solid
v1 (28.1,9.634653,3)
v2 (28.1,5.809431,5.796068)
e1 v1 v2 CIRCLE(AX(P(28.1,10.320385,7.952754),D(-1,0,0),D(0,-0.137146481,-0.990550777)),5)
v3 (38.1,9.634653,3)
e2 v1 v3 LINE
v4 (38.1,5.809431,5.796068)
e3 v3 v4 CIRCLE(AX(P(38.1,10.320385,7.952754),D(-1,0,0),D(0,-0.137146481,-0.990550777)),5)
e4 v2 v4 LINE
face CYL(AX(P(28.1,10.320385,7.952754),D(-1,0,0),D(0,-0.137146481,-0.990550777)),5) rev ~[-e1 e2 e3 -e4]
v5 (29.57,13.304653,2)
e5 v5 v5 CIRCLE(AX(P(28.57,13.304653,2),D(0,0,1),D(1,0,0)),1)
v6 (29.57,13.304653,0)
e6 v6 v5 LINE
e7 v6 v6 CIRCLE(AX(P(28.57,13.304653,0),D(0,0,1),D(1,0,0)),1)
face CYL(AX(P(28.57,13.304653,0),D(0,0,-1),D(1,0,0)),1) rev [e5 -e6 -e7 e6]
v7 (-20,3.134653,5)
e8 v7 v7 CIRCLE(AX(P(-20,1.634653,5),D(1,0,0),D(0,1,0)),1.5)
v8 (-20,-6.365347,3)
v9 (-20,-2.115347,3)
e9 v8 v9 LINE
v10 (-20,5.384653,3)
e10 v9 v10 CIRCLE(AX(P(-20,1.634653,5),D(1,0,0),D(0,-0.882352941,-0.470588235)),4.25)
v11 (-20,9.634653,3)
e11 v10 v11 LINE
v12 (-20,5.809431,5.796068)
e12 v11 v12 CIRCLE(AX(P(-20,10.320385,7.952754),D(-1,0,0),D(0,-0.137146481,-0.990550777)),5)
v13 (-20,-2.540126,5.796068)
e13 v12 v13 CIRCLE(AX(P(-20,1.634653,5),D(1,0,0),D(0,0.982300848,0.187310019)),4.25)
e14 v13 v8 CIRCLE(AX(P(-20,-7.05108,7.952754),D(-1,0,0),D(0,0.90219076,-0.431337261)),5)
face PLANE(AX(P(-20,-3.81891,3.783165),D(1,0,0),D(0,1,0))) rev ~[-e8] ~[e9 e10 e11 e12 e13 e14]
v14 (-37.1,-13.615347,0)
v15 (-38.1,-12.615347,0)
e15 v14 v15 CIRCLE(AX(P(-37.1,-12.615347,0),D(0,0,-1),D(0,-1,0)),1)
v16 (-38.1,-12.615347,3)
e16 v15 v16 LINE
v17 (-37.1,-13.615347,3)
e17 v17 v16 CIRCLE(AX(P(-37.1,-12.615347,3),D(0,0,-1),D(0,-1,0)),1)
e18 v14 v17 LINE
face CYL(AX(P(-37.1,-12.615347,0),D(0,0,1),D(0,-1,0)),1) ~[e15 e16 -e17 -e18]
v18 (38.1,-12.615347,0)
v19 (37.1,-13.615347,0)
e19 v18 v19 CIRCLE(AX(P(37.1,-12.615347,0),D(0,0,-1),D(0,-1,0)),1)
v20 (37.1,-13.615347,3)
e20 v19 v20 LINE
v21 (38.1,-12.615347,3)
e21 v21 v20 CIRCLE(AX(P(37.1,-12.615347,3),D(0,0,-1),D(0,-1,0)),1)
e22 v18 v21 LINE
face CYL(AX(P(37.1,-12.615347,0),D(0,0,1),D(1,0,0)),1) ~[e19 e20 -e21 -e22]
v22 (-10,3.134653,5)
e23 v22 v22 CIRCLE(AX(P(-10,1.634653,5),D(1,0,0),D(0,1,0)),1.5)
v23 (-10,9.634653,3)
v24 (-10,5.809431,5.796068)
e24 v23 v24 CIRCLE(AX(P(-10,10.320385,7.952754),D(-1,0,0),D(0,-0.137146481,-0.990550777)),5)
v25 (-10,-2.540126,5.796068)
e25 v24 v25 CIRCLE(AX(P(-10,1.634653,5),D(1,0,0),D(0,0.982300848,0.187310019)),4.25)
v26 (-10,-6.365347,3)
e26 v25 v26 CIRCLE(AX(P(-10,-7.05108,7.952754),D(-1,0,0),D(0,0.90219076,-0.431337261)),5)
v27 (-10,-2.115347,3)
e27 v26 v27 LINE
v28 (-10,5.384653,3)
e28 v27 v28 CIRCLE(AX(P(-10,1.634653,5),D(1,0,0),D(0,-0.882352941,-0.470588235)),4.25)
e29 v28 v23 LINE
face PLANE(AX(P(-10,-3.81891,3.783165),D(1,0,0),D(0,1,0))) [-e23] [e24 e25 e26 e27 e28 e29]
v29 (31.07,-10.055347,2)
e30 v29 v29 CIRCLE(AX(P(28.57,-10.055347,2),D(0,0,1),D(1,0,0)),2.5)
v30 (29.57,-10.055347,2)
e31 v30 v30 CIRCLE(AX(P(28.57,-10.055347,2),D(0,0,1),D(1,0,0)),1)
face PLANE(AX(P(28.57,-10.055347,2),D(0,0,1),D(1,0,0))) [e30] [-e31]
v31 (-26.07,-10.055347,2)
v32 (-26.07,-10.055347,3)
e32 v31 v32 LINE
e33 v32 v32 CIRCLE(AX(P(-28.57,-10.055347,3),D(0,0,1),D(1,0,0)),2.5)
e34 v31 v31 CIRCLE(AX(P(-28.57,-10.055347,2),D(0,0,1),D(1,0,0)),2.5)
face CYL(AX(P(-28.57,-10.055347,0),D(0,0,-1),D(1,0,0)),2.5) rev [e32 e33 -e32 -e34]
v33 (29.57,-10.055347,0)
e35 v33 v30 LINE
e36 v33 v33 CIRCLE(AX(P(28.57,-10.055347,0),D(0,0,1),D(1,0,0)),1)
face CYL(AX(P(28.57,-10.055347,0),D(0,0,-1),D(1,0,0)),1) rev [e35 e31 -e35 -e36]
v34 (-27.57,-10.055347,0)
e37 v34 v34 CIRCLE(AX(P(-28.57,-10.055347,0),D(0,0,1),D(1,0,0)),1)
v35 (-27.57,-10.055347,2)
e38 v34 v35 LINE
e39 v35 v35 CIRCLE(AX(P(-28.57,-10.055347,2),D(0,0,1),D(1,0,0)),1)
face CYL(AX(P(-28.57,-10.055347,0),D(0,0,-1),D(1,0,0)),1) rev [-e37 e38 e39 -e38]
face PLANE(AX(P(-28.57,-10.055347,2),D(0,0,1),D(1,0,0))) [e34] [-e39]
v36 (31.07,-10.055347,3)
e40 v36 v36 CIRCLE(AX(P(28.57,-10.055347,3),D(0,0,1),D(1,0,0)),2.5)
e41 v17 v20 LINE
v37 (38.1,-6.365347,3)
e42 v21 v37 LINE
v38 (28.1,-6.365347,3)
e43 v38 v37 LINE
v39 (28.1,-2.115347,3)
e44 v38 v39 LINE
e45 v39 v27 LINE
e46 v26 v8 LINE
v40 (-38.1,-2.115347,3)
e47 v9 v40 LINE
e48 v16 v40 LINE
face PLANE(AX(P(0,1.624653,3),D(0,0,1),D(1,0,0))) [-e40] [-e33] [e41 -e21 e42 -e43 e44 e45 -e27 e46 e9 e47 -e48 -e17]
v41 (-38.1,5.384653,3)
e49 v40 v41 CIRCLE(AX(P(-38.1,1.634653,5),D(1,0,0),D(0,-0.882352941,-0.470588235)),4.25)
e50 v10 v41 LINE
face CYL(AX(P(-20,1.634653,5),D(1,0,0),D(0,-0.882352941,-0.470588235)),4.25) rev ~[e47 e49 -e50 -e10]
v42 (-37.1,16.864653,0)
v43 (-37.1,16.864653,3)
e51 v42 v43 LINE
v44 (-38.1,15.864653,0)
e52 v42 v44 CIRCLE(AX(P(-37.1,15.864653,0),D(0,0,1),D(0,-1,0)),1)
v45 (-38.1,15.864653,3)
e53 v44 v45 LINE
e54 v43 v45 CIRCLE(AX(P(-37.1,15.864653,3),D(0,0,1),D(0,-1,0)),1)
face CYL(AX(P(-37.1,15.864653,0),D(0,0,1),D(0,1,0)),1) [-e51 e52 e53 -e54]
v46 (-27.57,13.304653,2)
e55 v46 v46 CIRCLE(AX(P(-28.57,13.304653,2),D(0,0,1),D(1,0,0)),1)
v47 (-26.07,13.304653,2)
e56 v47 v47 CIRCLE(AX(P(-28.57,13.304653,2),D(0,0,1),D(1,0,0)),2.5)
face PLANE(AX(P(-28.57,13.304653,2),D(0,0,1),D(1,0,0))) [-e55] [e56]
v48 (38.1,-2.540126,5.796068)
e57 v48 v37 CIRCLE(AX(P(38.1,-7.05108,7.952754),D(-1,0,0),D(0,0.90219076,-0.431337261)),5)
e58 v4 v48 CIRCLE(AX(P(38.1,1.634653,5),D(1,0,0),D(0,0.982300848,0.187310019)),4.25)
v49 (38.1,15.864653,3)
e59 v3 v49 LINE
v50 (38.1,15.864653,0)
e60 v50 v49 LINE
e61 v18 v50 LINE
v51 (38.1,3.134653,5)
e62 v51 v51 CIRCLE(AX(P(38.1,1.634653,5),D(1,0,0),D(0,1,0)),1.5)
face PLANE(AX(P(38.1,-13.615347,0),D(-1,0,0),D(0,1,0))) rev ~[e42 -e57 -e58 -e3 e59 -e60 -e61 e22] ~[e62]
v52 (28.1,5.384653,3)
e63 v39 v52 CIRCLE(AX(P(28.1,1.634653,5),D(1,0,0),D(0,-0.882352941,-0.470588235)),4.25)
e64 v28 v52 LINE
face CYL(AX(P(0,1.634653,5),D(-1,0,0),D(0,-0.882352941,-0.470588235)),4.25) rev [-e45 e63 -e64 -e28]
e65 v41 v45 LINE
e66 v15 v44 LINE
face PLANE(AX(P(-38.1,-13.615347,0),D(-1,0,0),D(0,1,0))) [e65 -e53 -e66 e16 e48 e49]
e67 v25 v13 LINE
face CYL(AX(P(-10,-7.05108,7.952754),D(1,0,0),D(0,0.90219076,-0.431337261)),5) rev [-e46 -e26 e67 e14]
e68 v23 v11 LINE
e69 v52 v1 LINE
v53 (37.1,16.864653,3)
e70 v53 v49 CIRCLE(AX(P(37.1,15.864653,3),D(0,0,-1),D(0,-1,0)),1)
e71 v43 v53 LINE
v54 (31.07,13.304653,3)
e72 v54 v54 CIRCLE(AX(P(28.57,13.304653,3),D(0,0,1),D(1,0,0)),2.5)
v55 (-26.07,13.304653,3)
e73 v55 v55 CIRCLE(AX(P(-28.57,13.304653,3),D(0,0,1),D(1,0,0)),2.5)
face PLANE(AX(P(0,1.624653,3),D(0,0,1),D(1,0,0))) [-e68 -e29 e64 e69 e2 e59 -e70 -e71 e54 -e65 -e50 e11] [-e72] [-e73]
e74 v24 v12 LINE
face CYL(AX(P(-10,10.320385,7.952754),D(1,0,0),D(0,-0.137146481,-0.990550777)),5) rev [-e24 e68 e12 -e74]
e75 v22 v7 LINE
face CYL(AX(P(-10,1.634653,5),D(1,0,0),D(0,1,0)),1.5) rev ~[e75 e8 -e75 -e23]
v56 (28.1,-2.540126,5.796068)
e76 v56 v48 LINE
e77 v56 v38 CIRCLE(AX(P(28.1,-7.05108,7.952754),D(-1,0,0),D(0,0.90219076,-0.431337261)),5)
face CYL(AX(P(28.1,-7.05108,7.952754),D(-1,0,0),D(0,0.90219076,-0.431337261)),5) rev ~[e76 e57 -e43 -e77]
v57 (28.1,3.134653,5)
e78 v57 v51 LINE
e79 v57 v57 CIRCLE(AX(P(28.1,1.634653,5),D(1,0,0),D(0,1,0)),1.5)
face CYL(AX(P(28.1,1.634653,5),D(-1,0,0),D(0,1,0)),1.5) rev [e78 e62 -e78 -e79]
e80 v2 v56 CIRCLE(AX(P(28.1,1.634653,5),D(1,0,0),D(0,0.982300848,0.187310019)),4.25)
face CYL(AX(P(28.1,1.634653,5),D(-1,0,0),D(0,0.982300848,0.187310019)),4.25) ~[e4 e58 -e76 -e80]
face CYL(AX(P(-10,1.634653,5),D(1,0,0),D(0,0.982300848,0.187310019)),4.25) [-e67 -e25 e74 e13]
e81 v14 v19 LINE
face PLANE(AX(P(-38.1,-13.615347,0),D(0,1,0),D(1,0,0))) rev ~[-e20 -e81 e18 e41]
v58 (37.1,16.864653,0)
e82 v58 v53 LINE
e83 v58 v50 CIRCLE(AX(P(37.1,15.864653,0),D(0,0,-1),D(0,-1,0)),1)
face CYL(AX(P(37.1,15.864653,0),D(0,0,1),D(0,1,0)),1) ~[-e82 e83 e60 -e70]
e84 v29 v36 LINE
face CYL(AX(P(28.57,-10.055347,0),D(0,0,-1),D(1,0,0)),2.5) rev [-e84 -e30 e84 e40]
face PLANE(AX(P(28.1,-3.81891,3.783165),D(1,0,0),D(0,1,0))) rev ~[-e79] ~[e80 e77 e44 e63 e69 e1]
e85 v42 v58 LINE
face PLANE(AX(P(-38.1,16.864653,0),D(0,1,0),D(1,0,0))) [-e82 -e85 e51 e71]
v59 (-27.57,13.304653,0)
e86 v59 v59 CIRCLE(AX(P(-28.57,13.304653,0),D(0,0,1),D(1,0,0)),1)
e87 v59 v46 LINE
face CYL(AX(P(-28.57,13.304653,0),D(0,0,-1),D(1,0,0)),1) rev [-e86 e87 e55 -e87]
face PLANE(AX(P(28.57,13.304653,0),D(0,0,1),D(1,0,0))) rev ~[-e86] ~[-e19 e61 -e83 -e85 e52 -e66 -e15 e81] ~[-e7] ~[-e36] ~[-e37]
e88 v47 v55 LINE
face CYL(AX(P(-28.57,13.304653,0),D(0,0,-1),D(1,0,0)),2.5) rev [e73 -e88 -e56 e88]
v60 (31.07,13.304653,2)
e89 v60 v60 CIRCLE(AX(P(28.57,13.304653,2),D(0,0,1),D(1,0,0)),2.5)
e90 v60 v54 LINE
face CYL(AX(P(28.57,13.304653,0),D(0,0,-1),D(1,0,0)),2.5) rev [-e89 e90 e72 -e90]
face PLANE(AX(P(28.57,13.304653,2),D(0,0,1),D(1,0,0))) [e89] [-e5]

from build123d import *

# Parameters (mm, degrees)
F0_W          = 76.2
F0_H          = 30.48
F0_R          = 2.5
F2_DEPTH      = 3
F0_R_2        = 1
F3_DEPTH      = 2
F4_START      = 28.1
F1_R          = 1.5
F4_DEPTH      = 10
F5_START      = -10
F5_DEPTH      = 10
F6_DEPTH      = 10
F6_DEPTH_BACK = 28.1
F7_R          = 1
F8_START      = -20
F8_DEPTH      = 30


with BuildPart() as f2:
    # F0 (on Top) → F2 (new body)
    with BuildSketch(Plane.XY):
        with Locations((0, 1.624652555)):
            Rectangle(F0_W, F0_H)
        with Locations((-28.57, -10.055347445)):
            Circle(F0_R, mode=Mode.SUBTRACT)
        with Locations((28.57, -10.055347445)):
            Circle(F0_R, mode=Mode.SUBTRACT)
        with Locations((-28.57, 13.304652555)):
            Circle(F0_R, mode=Mode.SUBTRACT)
        with Locations((28.57, 13.304652555)):
            Circle(F0_R, mode=Mode.SUBTRACT)
    extrude(amount=F2_DEPTH)

    # F0 (on Top) → F3 (join)
    with BuildSketch(Plane.XY):
        with Locations((28.57, 13.304652555)):
            Circle(F0_R)
        with Locations((28.57, 13.304652555)):
            Circle(F0_R_2, mode=Mode.SUBTRACT)
        with Locations((28.57, -10.055347445)):
            Circle(F0_R)
        with Locations((28.57, -10.055347445)):
            Circle(F0_R_2, mode=Mode.SUBTRACT)
        with Locations((-28.57, -10.055347445)):
            Circle(F0_R)
        with Locations((-28.57, -10.055347445)):
            Circle(F0_R_2, mode=Mode.SUBTRACT)
        with Locations((-28.57, 13.304652555)):
            Circle(F0_R)
        with Locations((-28.57, 13.304652555)):
            Circle(F0_R_2, mode=Mode.SUBTRACT)
    extrude(amount=F3_DEPTH)

    # F1 (on Right) → F4 (join)
    with BuildSketch(Plane.YZ.offset(F4_START)):
        with BuildLine():
            ThreePointArc((-2.5401260508, 5.7960675804), (-4.1005061168, 3.9161569732), (-6.365347445, 3))
            Line((-6.365347445, 3), (-2.115347445, 3))
            ThreePointArc((-2.115347445, 3), (-2.5671360482, 4.3616642469), (-2.5401260508, 5.7960675804))
        make_face()
        with BuildLine():
            Line((5.384652555, 3), (9.634652555, 3))
            ThreePointArc((9.634652555, 3), (7.3698112268, 3.9161569732), (5.8094311608, 5.7960675804))
            ThreePointArc((5.8094311608, 5.7960675804), (5.8658054165, 5.3998067817), (5.884652555, 5))
            ThreePointArc((5.884652555, 5), (5.7577581806, 3.9692235936), (5.384652555, 3))
        make_face()
        with BuildLine():
            ThreePointArc((-2.5401260508, 5.7960675804), (-2.5671360482, 4.3616642469), (-2.115347445, 3))
            Line((-2.115347445, 3), (5.384652555, 3))
            ThreePointArc((5.384652555, 3), (5.7577581806, 3.9692235936), (5.884652555, 5))
            ThreePointArc((5.884652555, 5), (5.8658054165, 5.3998067817), (5.8094311608, 5.7960675804))
            ThreePointArc((5.8094311608, 5.7960675804), (1.634652555, 9.25), (-2.5401260508, 5.7960675804))
        make_face()
        with Locations((1.634652555, 5)):
            Circle(F1_R, mode=Mode.SUBTRACT)
    extrude(amount=F4_DEPTH)

    # F1 (on Right) → F5 (join)
    with BuildSketch(Plane.YZ.offset(F5_START)):
        with BuildLine():
            ThreePointArc((-2.5401260508, 5.7960675804), (-4.1005061168, 3.9161569732), (-6.365347445, 3))
            Line((-6.365347445, 3), (-2.115347445, 3))
            ThreePointArc((-2.115347445, 3), (-2.5671360482, 4.3616642469), (-2.5401260508, 5.7960675804))
        make_face()
        with BuildLine():
            Line((5.384652555, 3), (9.634652555, 3))
            ThreePointArc((9.634652555, 3), (7.3698112268, 3.9161569732), (5.8094311608, 5.7960675804))
            ThreePointArc((5.8094311608, 5.7960675804), (5.8658054165, 5.3998067817), (5.884652555, 5))
            ThreePointArc((5.884652555, 5), (5.7577581806, 3.9692235936), (5.384652555, 3))
        make_face()
        with BuildLine():
            ThreePointArc((-2.5401260508, 5.7960675804), (-2.5671360482, 4.3616642469), (-2.115347445, 3))
            Line((-2.115347445, 3), (5.384652555, 3))
            ThreePointArc((5.384652555, 3), (5.7577581806, 3.9692235936), (5.884652555, 5))
            ThreePointArc((5.884652555, 5), (5.8658054165, 5.3998067817), (5.8094311608, 5.7960675804))
            ThreePointArc((5.8094311608, 5.7960675804), (1.634652555, 9.25), (-2.5401260508, 5.7960675804))
        make_face()
        with Locations((1.634652555, 5)):
            Circle(F1_R, mode=Mode.SUBTRACT)
    extrude(amount=-F5_DEPTH)

    # F1 (on Right) → F6 (cut, two sides)
    with BuildSketch(Plane.YZ) as f6_sk:
        with BuildLine():
            Line((5.384652555, 3), (-2.115347445, 3))
            ThreePointArc((-2.115347445, 3), (1.634652555, 0.75), (5.384652555, 3))
        make_face()
    extrude(amount=-F6_DEPTH, mode=Mode.SUBTRACT)
    extrude(f6_sk.sketch, amount=F6_DEPTH_BACK, mode=Mode.SUBTRACT)

    # F7
    f7_edges = [f2.edges().sort_by_distance(p)[0] for p in [
        (38.1, -13.615347, 1.5),
        (38.1, 16.864653, 1.5),
        (-38.1, 16.864653, 1.5),
        (-38.1, -13.615347, 1.5),
    ]]
    fillet(f7_edges, radius=F7_R)

    # F1 (on Right) → F8 (cut)
    with BuildSketch(Plane.YZ.offset(F8_START)):
        with BuildLine():
            ThreePointArc((-2.5401260508, 5.7960675804), (-2.5671360482, 4.3616642469), (-2.115347445, 3))
            Line((-2.115347445, 3), (5.384652555, 3))
            ThreePointArc((5.384652555, 3), (5.7577581806, 3.9692235936), (5.884652555, 5))
            ThreePointArc((5.884652555, 5), (5.8658054165, 5.3998067817), (5.8094311608, 5.7960675804))
            ThreePointArc((5.8094311608, 5.7960675804), (1.634652555, 9.25), (-2.5401260508, 5.7960675804))
        make_face()
        with Locations((1.634652555, 5)):
            Circle(F1_R, mode=Mode.SUBTRACT)
        with BuildLine():
            Line((5.384652555, 3), (-2.115347445, 3))
            ThreePointArc((-2.115347445, 3), (1.634652555, 0.75), (5.384652555, 3))
        make_face()
    extrude(amount=-F8_DEPTH, mode=Mode.SUBTRACT)


solid = f2.part
